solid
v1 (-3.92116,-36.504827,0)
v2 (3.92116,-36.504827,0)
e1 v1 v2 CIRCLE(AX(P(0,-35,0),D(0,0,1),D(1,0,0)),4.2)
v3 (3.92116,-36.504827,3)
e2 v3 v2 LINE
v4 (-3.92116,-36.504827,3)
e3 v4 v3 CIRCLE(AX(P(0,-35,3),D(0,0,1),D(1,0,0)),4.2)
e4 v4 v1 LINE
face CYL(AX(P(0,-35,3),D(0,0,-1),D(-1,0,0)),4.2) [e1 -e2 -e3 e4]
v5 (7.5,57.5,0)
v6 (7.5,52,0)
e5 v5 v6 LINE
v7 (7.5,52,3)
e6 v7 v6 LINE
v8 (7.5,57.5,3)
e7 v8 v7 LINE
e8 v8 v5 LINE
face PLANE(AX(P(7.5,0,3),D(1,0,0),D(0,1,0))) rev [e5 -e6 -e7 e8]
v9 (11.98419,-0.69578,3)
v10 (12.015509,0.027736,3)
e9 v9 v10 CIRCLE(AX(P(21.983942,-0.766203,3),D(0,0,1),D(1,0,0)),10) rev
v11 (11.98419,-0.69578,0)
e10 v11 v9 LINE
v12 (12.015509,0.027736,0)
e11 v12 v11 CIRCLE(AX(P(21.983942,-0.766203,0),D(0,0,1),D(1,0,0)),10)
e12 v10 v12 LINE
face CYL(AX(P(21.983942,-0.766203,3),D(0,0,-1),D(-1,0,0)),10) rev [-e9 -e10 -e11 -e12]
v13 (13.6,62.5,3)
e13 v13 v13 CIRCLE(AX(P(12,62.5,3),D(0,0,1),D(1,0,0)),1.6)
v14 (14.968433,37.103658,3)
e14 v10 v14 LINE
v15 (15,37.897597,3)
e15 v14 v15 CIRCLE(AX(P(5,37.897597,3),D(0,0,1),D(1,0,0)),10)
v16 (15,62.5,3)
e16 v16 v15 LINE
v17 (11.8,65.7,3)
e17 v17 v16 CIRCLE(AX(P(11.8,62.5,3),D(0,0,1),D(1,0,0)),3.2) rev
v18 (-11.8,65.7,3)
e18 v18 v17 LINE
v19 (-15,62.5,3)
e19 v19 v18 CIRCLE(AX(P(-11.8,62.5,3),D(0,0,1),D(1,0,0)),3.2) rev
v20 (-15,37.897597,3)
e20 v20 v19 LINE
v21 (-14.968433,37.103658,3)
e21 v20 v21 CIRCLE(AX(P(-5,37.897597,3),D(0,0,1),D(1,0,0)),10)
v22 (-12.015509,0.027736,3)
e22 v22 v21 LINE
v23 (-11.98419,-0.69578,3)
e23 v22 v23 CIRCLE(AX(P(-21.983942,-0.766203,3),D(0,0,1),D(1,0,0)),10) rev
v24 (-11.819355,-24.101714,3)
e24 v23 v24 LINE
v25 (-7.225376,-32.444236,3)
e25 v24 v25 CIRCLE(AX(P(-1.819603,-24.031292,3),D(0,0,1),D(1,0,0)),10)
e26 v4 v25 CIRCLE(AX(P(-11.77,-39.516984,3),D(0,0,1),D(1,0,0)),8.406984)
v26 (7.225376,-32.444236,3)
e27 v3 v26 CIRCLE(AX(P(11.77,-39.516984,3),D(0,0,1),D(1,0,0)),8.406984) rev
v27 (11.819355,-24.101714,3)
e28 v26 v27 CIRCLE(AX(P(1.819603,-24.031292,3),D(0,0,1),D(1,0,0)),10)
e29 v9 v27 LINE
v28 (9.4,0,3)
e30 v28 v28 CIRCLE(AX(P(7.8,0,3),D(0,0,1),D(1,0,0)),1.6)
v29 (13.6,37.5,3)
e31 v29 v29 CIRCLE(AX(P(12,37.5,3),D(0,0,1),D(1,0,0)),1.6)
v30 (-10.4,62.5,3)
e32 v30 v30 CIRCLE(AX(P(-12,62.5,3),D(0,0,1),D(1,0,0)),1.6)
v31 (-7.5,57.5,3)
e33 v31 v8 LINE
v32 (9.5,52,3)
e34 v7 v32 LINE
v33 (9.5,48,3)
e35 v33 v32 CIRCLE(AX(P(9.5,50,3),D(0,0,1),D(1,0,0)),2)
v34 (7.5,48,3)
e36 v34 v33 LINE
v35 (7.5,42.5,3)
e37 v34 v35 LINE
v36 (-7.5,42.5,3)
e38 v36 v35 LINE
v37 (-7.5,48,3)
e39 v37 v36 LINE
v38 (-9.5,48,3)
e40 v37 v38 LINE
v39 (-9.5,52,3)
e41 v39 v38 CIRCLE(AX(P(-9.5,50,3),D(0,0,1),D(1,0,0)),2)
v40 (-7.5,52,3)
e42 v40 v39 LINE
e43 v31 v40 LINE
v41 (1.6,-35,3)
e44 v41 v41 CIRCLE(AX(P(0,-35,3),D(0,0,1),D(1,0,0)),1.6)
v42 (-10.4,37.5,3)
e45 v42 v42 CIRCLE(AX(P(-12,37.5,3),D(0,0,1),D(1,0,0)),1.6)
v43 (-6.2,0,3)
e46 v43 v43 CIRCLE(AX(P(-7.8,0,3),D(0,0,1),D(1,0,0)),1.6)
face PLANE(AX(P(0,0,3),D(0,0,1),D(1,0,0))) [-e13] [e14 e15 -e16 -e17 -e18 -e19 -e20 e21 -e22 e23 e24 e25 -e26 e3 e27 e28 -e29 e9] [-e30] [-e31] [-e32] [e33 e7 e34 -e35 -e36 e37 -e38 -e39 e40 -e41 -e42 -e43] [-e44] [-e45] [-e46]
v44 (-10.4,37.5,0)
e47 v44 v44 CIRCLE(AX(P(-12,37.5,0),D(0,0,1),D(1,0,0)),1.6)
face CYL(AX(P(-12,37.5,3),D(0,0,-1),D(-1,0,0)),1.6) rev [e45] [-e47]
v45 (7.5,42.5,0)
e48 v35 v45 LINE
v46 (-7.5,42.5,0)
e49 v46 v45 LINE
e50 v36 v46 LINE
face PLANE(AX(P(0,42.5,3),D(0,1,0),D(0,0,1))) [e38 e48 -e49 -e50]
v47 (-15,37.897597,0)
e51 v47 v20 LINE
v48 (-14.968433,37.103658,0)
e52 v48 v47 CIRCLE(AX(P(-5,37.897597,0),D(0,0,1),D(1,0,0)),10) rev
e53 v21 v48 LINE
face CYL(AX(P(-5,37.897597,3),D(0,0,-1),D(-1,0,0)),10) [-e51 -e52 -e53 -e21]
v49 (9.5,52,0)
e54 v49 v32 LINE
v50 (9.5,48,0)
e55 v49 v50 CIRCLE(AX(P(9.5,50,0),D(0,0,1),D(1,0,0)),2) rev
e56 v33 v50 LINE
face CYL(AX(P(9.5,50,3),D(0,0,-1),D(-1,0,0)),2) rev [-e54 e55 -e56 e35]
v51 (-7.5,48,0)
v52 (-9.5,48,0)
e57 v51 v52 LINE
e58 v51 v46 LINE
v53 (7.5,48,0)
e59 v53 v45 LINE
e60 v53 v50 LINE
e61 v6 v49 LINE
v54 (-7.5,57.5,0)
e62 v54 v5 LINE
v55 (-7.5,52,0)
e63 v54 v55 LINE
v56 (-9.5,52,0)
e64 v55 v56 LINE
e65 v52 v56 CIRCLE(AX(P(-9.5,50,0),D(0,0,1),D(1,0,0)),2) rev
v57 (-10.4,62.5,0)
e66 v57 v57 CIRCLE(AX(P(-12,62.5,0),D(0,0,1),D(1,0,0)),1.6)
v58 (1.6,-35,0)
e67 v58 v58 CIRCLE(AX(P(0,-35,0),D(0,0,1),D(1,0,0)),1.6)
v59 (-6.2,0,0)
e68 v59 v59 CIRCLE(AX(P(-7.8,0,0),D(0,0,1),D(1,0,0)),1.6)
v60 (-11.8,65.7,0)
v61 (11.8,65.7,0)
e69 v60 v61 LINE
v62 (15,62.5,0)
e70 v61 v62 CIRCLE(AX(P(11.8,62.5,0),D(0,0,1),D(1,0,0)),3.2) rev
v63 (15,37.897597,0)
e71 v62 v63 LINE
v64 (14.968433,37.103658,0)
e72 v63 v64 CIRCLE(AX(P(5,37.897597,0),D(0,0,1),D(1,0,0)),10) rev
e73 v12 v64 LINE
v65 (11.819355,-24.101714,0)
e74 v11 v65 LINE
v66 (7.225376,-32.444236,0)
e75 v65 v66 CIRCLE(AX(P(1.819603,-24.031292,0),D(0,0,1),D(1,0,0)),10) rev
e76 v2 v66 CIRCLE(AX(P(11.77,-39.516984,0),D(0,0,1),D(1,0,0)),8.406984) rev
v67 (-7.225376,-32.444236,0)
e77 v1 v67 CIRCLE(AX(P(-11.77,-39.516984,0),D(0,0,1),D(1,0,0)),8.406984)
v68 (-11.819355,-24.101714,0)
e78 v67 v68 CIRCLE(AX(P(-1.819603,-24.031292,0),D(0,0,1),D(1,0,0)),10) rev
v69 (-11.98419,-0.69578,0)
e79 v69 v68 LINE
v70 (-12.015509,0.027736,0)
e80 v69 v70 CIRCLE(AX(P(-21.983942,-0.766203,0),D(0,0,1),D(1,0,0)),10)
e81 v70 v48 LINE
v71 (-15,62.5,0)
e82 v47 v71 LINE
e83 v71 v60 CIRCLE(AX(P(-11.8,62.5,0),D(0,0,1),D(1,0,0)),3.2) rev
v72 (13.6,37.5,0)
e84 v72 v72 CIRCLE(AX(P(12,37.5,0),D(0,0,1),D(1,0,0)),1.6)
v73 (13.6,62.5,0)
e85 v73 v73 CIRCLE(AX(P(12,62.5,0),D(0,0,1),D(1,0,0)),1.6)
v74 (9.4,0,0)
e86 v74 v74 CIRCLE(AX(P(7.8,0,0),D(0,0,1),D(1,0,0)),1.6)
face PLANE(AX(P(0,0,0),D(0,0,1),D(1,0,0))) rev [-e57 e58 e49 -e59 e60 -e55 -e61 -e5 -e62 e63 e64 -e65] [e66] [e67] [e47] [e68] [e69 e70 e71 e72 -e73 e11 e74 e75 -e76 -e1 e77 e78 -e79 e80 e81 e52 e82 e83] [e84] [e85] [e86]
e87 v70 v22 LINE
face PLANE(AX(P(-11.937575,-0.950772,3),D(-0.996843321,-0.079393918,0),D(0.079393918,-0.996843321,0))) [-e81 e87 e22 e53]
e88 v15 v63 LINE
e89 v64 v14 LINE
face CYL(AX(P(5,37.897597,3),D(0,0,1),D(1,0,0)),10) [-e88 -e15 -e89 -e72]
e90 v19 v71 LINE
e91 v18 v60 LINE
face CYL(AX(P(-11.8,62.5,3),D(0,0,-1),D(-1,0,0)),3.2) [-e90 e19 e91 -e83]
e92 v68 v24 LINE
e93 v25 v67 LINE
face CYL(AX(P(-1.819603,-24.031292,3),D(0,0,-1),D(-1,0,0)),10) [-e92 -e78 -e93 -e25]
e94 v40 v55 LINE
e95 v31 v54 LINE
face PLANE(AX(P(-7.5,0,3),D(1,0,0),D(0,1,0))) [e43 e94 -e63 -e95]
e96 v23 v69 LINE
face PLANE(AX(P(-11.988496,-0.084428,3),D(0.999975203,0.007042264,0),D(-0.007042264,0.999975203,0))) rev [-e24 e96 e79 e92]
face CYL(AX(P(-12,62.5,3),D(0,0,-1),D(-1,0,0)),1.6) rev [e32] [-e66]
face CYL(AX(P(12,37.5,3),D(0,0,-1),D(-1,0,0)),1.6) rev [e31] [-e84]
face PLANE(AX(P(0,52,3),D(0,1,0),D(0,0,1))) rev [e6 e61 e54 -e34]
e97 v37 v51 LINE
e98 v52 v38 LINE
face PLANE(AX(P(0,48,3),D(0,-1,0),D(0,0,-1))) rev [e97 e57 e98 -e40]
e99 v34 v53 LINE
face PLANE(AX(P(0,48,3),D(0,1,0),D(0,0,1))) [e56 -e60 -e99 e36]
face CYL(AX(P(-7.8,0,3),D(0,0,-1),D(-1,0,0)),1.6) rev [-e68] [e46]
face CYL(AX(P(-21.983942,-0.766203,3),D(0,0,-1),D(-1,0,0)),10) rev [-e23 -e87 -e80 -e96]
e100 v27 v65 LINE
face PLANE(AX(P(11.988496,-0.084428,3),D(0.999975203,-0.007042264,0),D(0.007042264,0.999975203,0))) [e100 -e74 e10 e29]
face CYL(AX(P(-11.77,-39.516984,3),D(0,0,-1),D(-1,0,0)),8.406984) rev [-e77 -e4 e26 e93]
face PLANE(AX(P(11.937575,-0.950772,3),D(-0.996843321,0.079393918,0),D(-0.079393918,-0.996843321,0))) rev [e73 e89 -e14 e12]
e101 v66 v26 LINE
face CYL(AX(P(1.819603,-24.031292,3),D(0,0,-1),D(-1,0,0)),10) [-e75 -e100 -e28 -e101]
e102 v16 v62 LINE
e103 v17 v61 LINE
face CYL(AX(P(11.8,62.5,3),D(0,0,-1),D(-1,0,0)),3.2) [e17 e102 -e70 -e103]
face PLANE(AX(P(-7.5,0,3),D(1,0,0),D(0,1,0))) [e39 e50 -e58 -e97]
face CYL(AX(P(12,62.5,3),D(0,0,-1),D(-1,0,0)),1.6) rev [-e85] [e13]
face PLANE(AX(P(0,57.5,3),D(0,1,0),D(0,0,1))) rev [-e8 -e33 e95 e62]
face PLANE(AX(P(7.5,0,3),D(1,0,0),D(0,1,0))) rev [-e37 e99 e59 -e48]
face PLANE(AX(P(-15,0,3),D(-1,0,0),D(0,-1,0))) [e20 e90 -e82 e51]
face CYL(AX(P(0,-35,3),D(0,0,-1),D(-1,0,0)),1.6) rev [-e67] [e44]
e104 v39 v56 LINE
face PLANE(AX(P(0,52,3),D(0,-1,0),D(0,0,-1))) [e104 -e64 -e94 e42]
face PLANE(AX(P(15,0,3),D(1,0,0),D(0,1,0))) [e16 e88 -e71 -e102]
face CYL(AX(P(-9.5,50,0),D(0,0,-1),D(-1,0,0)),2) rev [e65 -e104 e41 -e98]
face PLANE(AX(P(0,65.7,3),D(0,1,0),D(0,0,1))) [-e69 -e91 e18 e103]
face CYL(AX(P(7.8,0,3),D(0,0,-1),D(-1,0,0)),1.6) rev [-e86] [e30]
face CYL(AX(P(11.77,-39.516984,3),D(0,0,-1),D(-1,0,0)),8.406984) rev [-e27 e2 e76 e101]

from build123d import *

# Parameters (mm, degrees)
SKETCH1_R           = 1.6
BOSS_EXTRUDE1_DEPTH = 3
FILLET1_R           = 10
FILLET2_R           = 2
FILLET3_R           = 2


# Some blends are built 0.0001 mm under size
with BuildPart() as part:
    # Sketch1 → Boss-Extrude1 (new body)
    with BuildSketch(Plane.XY):
        with BuildLine():
            Line((-15, 37.5), (-11.986741947, -0.333454454))
            Line((-11.986741947, -0.333454454), (-11.77, -31.11))
            ThreePointArc((-11.77, -31.11), (-7.007950772, -32.588761506), (-3.921159912, -36.504827214))
            ThreePointArc((-3.921159912, -36.504827214), (0, -39.2), (3.921159912, -36.504827214))
            ThreePointArc((3.921159912, -36.504827214), (7.007950772, -32.588761506), (11.77, -31.11))
            Line((11.77, -31.11), (11.986741947, -0.333454454))
            Line((11.986741947, -0.333454454), (15, 37.5))
            Line((15, 37.5), (15, 62.5))
            ThreePointArc((15, 62.5), (14.0627417, 64.7627417), (11.8, 65.7))
            Line((11.8, 65.7), (-11.8, 65.7))
            ThreePointArc((-11.8, 65.7), (-14.0627417, 64.7627417), (-15, 62.5))
            Line((-15, 62.5), (-15, 37.5))
        make_face()
        with Locations((7.8, 0)):
            Circle(SKETCH1_R, mode=Mode.SUBTRACT)
        with Locations((-12, 37.5)):
            Circle(SKETCH1_R, mode=Mode.SUBTRACT)
        with Locations((-12, 62.5)):
            Circle(SKETCH1_R, mode=Mode.SUBTRACT)
        Polygon((-7.5, 57.5), (7.5, 57.5), (7.5, 52), (11.5, 52), (11.5, 48), (7.5, 48), (7.5, 42.5), (-7.5, 42.5), (-7.5, 48), (-11.5, 48), (-11.5, 52), (-7.5, 52), align=None, mode=Mode.SUBTRACT)
        with Locations((12, 37.5)):
            Circle(SKETCH1_R, mode=Mode.SUBTRACT)
        with Locations((12, 62.5)):
            Circle(SKETCH1_R, mode=Mode.SUBTRACT)
        with Locations((-7.8, 0)):
            Circle(SKETCH1_R, mode=Mode.SUBTRACT)
        with Locations((0, -35)):
            Circle(SKETCH1_R, mode=Mode.SUBTRACT)
    extrude(amount=BOSS_EXTRUDE1_DEPTH)

    # Fillet1
    # the kernel refuses this fillet: 10 mm, written as the material it adds along each edge
    with BuildSketch(Plane(origin=(-11.986741947, -0.333454454, 0), x_dir=(-0.07939391755808242, 0.9968433206150205, 0), z_dir=(0, 0, 1)), Plane(origin=(11.986741947, -0.333454454, 0), x_dir=(-0.0070422644314045895, -0.9999752029483923, 0), z_dir=(0, 0, 1))) as fillet1_piece_1:
        with BuildLine():
            CenterArc((FILLET1_R * 0.0362334645201, FILLET1_R), FILLET1_R, 265.849766407, 4.150233593)
            Line((-FILLET1_R * 0.0361384500424, FILLET1_R * 0.00262228519856), (0, 0))
            Line((0, 0), (FILLET1_R * 0.0362334645201, 0))
        make_face()
    extrude(amount=3)
    # the kernel refuses this fillet: 10 mm, written as the material it takes off along each edge
    with BuildSketch(Plane(origin=(-11.77, -31.11, -17.521148691), x_dir=(-0.007042264431403126, 0.9999752029483922, 0), z_dir=(0, 0, 1))) as fillet1_2_piece_1:
        with BuildLine():
            CenterArc((7.008459476, -10), FILLET1_R, 90, 56.873561784)
            ThreePointArc((-1.366206899, -4.535115453), (-0.357121593, -2.365760003), (0, 0))
            Line((0, 0), (7.008459476, 0))
        make_face()
    extrude(amount=38.042297381, mode=Mode.SUBTRACT)
    with BuildSketch(Plane(origin=(-15, 37.5, -0.993992828), x_dir=(0, 1, 0), z_dir=(0, 0, 1)), Plane(origin=(15, 37.5, -0.993992828), x_dir=(-0.07939391755808864, -0.9968433206150199, 0), z_dir=(0, 0, 1))) as fillet1_2_piece_2:
        with BuildLine():
            CenterArc((FILLET1_R * 0.0397597131124, -FILLET1_R), FILLET1_R, 90, 4.553728958)
            Line((-FILLET1_R * 0.0396342044457, -FILLET1_R * 0.00315667938498), (0, 0))
            Line((0, 0), (FILLET1_R * 0.0397597131124, 0))
        make_face()
    extrude(amount=4.987985656, mode=Mode.SUBTRACT)
    with BuildSketch(Plane(origin=(11.77, -31.11, -17.521148691), x_dir=(-0.9595036182786473, -0.2816963019107352, 0), z_dir=(0, 0, 1))) as fillet1_2_piece_3:
        with BuildLine():
            CenterArc((7.553395586, -9.595036183), FILLET1_R, 106.361471425, 56.873561784)
            Line((-2.02156487, -6.710572234), (0, 0))
            ThreePointArc((0, 0), (2.368216284, -0.34045243), (4.736432567, 0))
        make_face()
    extrude(amount=38.042297381, mode=Mode.SUBTRACT)

    # Fillet2
    fillet2_edges = [part.edges().sort_by_distance(p)[0] for p in [
        (-11.5, 52, 1.5),
        (-11.5, 48, 1.5),
    ]]
    fillet(fillet2_edges, radius=FILLET2_R - 0.0001)  # a hair under: the kernel refuses the full size

    # Fillet3
    fillet3_edges = [part.edges().sort_by_distance(p)[0] for p in [
        (11.5, 48, 1.5),
        (11.5, 52, 1.5),
    ]]
    fillet(fillet3_edges, radius=FILLET3_R - 0.0001)  # a hair under: the kernel refuses the full size


solid = part.part
